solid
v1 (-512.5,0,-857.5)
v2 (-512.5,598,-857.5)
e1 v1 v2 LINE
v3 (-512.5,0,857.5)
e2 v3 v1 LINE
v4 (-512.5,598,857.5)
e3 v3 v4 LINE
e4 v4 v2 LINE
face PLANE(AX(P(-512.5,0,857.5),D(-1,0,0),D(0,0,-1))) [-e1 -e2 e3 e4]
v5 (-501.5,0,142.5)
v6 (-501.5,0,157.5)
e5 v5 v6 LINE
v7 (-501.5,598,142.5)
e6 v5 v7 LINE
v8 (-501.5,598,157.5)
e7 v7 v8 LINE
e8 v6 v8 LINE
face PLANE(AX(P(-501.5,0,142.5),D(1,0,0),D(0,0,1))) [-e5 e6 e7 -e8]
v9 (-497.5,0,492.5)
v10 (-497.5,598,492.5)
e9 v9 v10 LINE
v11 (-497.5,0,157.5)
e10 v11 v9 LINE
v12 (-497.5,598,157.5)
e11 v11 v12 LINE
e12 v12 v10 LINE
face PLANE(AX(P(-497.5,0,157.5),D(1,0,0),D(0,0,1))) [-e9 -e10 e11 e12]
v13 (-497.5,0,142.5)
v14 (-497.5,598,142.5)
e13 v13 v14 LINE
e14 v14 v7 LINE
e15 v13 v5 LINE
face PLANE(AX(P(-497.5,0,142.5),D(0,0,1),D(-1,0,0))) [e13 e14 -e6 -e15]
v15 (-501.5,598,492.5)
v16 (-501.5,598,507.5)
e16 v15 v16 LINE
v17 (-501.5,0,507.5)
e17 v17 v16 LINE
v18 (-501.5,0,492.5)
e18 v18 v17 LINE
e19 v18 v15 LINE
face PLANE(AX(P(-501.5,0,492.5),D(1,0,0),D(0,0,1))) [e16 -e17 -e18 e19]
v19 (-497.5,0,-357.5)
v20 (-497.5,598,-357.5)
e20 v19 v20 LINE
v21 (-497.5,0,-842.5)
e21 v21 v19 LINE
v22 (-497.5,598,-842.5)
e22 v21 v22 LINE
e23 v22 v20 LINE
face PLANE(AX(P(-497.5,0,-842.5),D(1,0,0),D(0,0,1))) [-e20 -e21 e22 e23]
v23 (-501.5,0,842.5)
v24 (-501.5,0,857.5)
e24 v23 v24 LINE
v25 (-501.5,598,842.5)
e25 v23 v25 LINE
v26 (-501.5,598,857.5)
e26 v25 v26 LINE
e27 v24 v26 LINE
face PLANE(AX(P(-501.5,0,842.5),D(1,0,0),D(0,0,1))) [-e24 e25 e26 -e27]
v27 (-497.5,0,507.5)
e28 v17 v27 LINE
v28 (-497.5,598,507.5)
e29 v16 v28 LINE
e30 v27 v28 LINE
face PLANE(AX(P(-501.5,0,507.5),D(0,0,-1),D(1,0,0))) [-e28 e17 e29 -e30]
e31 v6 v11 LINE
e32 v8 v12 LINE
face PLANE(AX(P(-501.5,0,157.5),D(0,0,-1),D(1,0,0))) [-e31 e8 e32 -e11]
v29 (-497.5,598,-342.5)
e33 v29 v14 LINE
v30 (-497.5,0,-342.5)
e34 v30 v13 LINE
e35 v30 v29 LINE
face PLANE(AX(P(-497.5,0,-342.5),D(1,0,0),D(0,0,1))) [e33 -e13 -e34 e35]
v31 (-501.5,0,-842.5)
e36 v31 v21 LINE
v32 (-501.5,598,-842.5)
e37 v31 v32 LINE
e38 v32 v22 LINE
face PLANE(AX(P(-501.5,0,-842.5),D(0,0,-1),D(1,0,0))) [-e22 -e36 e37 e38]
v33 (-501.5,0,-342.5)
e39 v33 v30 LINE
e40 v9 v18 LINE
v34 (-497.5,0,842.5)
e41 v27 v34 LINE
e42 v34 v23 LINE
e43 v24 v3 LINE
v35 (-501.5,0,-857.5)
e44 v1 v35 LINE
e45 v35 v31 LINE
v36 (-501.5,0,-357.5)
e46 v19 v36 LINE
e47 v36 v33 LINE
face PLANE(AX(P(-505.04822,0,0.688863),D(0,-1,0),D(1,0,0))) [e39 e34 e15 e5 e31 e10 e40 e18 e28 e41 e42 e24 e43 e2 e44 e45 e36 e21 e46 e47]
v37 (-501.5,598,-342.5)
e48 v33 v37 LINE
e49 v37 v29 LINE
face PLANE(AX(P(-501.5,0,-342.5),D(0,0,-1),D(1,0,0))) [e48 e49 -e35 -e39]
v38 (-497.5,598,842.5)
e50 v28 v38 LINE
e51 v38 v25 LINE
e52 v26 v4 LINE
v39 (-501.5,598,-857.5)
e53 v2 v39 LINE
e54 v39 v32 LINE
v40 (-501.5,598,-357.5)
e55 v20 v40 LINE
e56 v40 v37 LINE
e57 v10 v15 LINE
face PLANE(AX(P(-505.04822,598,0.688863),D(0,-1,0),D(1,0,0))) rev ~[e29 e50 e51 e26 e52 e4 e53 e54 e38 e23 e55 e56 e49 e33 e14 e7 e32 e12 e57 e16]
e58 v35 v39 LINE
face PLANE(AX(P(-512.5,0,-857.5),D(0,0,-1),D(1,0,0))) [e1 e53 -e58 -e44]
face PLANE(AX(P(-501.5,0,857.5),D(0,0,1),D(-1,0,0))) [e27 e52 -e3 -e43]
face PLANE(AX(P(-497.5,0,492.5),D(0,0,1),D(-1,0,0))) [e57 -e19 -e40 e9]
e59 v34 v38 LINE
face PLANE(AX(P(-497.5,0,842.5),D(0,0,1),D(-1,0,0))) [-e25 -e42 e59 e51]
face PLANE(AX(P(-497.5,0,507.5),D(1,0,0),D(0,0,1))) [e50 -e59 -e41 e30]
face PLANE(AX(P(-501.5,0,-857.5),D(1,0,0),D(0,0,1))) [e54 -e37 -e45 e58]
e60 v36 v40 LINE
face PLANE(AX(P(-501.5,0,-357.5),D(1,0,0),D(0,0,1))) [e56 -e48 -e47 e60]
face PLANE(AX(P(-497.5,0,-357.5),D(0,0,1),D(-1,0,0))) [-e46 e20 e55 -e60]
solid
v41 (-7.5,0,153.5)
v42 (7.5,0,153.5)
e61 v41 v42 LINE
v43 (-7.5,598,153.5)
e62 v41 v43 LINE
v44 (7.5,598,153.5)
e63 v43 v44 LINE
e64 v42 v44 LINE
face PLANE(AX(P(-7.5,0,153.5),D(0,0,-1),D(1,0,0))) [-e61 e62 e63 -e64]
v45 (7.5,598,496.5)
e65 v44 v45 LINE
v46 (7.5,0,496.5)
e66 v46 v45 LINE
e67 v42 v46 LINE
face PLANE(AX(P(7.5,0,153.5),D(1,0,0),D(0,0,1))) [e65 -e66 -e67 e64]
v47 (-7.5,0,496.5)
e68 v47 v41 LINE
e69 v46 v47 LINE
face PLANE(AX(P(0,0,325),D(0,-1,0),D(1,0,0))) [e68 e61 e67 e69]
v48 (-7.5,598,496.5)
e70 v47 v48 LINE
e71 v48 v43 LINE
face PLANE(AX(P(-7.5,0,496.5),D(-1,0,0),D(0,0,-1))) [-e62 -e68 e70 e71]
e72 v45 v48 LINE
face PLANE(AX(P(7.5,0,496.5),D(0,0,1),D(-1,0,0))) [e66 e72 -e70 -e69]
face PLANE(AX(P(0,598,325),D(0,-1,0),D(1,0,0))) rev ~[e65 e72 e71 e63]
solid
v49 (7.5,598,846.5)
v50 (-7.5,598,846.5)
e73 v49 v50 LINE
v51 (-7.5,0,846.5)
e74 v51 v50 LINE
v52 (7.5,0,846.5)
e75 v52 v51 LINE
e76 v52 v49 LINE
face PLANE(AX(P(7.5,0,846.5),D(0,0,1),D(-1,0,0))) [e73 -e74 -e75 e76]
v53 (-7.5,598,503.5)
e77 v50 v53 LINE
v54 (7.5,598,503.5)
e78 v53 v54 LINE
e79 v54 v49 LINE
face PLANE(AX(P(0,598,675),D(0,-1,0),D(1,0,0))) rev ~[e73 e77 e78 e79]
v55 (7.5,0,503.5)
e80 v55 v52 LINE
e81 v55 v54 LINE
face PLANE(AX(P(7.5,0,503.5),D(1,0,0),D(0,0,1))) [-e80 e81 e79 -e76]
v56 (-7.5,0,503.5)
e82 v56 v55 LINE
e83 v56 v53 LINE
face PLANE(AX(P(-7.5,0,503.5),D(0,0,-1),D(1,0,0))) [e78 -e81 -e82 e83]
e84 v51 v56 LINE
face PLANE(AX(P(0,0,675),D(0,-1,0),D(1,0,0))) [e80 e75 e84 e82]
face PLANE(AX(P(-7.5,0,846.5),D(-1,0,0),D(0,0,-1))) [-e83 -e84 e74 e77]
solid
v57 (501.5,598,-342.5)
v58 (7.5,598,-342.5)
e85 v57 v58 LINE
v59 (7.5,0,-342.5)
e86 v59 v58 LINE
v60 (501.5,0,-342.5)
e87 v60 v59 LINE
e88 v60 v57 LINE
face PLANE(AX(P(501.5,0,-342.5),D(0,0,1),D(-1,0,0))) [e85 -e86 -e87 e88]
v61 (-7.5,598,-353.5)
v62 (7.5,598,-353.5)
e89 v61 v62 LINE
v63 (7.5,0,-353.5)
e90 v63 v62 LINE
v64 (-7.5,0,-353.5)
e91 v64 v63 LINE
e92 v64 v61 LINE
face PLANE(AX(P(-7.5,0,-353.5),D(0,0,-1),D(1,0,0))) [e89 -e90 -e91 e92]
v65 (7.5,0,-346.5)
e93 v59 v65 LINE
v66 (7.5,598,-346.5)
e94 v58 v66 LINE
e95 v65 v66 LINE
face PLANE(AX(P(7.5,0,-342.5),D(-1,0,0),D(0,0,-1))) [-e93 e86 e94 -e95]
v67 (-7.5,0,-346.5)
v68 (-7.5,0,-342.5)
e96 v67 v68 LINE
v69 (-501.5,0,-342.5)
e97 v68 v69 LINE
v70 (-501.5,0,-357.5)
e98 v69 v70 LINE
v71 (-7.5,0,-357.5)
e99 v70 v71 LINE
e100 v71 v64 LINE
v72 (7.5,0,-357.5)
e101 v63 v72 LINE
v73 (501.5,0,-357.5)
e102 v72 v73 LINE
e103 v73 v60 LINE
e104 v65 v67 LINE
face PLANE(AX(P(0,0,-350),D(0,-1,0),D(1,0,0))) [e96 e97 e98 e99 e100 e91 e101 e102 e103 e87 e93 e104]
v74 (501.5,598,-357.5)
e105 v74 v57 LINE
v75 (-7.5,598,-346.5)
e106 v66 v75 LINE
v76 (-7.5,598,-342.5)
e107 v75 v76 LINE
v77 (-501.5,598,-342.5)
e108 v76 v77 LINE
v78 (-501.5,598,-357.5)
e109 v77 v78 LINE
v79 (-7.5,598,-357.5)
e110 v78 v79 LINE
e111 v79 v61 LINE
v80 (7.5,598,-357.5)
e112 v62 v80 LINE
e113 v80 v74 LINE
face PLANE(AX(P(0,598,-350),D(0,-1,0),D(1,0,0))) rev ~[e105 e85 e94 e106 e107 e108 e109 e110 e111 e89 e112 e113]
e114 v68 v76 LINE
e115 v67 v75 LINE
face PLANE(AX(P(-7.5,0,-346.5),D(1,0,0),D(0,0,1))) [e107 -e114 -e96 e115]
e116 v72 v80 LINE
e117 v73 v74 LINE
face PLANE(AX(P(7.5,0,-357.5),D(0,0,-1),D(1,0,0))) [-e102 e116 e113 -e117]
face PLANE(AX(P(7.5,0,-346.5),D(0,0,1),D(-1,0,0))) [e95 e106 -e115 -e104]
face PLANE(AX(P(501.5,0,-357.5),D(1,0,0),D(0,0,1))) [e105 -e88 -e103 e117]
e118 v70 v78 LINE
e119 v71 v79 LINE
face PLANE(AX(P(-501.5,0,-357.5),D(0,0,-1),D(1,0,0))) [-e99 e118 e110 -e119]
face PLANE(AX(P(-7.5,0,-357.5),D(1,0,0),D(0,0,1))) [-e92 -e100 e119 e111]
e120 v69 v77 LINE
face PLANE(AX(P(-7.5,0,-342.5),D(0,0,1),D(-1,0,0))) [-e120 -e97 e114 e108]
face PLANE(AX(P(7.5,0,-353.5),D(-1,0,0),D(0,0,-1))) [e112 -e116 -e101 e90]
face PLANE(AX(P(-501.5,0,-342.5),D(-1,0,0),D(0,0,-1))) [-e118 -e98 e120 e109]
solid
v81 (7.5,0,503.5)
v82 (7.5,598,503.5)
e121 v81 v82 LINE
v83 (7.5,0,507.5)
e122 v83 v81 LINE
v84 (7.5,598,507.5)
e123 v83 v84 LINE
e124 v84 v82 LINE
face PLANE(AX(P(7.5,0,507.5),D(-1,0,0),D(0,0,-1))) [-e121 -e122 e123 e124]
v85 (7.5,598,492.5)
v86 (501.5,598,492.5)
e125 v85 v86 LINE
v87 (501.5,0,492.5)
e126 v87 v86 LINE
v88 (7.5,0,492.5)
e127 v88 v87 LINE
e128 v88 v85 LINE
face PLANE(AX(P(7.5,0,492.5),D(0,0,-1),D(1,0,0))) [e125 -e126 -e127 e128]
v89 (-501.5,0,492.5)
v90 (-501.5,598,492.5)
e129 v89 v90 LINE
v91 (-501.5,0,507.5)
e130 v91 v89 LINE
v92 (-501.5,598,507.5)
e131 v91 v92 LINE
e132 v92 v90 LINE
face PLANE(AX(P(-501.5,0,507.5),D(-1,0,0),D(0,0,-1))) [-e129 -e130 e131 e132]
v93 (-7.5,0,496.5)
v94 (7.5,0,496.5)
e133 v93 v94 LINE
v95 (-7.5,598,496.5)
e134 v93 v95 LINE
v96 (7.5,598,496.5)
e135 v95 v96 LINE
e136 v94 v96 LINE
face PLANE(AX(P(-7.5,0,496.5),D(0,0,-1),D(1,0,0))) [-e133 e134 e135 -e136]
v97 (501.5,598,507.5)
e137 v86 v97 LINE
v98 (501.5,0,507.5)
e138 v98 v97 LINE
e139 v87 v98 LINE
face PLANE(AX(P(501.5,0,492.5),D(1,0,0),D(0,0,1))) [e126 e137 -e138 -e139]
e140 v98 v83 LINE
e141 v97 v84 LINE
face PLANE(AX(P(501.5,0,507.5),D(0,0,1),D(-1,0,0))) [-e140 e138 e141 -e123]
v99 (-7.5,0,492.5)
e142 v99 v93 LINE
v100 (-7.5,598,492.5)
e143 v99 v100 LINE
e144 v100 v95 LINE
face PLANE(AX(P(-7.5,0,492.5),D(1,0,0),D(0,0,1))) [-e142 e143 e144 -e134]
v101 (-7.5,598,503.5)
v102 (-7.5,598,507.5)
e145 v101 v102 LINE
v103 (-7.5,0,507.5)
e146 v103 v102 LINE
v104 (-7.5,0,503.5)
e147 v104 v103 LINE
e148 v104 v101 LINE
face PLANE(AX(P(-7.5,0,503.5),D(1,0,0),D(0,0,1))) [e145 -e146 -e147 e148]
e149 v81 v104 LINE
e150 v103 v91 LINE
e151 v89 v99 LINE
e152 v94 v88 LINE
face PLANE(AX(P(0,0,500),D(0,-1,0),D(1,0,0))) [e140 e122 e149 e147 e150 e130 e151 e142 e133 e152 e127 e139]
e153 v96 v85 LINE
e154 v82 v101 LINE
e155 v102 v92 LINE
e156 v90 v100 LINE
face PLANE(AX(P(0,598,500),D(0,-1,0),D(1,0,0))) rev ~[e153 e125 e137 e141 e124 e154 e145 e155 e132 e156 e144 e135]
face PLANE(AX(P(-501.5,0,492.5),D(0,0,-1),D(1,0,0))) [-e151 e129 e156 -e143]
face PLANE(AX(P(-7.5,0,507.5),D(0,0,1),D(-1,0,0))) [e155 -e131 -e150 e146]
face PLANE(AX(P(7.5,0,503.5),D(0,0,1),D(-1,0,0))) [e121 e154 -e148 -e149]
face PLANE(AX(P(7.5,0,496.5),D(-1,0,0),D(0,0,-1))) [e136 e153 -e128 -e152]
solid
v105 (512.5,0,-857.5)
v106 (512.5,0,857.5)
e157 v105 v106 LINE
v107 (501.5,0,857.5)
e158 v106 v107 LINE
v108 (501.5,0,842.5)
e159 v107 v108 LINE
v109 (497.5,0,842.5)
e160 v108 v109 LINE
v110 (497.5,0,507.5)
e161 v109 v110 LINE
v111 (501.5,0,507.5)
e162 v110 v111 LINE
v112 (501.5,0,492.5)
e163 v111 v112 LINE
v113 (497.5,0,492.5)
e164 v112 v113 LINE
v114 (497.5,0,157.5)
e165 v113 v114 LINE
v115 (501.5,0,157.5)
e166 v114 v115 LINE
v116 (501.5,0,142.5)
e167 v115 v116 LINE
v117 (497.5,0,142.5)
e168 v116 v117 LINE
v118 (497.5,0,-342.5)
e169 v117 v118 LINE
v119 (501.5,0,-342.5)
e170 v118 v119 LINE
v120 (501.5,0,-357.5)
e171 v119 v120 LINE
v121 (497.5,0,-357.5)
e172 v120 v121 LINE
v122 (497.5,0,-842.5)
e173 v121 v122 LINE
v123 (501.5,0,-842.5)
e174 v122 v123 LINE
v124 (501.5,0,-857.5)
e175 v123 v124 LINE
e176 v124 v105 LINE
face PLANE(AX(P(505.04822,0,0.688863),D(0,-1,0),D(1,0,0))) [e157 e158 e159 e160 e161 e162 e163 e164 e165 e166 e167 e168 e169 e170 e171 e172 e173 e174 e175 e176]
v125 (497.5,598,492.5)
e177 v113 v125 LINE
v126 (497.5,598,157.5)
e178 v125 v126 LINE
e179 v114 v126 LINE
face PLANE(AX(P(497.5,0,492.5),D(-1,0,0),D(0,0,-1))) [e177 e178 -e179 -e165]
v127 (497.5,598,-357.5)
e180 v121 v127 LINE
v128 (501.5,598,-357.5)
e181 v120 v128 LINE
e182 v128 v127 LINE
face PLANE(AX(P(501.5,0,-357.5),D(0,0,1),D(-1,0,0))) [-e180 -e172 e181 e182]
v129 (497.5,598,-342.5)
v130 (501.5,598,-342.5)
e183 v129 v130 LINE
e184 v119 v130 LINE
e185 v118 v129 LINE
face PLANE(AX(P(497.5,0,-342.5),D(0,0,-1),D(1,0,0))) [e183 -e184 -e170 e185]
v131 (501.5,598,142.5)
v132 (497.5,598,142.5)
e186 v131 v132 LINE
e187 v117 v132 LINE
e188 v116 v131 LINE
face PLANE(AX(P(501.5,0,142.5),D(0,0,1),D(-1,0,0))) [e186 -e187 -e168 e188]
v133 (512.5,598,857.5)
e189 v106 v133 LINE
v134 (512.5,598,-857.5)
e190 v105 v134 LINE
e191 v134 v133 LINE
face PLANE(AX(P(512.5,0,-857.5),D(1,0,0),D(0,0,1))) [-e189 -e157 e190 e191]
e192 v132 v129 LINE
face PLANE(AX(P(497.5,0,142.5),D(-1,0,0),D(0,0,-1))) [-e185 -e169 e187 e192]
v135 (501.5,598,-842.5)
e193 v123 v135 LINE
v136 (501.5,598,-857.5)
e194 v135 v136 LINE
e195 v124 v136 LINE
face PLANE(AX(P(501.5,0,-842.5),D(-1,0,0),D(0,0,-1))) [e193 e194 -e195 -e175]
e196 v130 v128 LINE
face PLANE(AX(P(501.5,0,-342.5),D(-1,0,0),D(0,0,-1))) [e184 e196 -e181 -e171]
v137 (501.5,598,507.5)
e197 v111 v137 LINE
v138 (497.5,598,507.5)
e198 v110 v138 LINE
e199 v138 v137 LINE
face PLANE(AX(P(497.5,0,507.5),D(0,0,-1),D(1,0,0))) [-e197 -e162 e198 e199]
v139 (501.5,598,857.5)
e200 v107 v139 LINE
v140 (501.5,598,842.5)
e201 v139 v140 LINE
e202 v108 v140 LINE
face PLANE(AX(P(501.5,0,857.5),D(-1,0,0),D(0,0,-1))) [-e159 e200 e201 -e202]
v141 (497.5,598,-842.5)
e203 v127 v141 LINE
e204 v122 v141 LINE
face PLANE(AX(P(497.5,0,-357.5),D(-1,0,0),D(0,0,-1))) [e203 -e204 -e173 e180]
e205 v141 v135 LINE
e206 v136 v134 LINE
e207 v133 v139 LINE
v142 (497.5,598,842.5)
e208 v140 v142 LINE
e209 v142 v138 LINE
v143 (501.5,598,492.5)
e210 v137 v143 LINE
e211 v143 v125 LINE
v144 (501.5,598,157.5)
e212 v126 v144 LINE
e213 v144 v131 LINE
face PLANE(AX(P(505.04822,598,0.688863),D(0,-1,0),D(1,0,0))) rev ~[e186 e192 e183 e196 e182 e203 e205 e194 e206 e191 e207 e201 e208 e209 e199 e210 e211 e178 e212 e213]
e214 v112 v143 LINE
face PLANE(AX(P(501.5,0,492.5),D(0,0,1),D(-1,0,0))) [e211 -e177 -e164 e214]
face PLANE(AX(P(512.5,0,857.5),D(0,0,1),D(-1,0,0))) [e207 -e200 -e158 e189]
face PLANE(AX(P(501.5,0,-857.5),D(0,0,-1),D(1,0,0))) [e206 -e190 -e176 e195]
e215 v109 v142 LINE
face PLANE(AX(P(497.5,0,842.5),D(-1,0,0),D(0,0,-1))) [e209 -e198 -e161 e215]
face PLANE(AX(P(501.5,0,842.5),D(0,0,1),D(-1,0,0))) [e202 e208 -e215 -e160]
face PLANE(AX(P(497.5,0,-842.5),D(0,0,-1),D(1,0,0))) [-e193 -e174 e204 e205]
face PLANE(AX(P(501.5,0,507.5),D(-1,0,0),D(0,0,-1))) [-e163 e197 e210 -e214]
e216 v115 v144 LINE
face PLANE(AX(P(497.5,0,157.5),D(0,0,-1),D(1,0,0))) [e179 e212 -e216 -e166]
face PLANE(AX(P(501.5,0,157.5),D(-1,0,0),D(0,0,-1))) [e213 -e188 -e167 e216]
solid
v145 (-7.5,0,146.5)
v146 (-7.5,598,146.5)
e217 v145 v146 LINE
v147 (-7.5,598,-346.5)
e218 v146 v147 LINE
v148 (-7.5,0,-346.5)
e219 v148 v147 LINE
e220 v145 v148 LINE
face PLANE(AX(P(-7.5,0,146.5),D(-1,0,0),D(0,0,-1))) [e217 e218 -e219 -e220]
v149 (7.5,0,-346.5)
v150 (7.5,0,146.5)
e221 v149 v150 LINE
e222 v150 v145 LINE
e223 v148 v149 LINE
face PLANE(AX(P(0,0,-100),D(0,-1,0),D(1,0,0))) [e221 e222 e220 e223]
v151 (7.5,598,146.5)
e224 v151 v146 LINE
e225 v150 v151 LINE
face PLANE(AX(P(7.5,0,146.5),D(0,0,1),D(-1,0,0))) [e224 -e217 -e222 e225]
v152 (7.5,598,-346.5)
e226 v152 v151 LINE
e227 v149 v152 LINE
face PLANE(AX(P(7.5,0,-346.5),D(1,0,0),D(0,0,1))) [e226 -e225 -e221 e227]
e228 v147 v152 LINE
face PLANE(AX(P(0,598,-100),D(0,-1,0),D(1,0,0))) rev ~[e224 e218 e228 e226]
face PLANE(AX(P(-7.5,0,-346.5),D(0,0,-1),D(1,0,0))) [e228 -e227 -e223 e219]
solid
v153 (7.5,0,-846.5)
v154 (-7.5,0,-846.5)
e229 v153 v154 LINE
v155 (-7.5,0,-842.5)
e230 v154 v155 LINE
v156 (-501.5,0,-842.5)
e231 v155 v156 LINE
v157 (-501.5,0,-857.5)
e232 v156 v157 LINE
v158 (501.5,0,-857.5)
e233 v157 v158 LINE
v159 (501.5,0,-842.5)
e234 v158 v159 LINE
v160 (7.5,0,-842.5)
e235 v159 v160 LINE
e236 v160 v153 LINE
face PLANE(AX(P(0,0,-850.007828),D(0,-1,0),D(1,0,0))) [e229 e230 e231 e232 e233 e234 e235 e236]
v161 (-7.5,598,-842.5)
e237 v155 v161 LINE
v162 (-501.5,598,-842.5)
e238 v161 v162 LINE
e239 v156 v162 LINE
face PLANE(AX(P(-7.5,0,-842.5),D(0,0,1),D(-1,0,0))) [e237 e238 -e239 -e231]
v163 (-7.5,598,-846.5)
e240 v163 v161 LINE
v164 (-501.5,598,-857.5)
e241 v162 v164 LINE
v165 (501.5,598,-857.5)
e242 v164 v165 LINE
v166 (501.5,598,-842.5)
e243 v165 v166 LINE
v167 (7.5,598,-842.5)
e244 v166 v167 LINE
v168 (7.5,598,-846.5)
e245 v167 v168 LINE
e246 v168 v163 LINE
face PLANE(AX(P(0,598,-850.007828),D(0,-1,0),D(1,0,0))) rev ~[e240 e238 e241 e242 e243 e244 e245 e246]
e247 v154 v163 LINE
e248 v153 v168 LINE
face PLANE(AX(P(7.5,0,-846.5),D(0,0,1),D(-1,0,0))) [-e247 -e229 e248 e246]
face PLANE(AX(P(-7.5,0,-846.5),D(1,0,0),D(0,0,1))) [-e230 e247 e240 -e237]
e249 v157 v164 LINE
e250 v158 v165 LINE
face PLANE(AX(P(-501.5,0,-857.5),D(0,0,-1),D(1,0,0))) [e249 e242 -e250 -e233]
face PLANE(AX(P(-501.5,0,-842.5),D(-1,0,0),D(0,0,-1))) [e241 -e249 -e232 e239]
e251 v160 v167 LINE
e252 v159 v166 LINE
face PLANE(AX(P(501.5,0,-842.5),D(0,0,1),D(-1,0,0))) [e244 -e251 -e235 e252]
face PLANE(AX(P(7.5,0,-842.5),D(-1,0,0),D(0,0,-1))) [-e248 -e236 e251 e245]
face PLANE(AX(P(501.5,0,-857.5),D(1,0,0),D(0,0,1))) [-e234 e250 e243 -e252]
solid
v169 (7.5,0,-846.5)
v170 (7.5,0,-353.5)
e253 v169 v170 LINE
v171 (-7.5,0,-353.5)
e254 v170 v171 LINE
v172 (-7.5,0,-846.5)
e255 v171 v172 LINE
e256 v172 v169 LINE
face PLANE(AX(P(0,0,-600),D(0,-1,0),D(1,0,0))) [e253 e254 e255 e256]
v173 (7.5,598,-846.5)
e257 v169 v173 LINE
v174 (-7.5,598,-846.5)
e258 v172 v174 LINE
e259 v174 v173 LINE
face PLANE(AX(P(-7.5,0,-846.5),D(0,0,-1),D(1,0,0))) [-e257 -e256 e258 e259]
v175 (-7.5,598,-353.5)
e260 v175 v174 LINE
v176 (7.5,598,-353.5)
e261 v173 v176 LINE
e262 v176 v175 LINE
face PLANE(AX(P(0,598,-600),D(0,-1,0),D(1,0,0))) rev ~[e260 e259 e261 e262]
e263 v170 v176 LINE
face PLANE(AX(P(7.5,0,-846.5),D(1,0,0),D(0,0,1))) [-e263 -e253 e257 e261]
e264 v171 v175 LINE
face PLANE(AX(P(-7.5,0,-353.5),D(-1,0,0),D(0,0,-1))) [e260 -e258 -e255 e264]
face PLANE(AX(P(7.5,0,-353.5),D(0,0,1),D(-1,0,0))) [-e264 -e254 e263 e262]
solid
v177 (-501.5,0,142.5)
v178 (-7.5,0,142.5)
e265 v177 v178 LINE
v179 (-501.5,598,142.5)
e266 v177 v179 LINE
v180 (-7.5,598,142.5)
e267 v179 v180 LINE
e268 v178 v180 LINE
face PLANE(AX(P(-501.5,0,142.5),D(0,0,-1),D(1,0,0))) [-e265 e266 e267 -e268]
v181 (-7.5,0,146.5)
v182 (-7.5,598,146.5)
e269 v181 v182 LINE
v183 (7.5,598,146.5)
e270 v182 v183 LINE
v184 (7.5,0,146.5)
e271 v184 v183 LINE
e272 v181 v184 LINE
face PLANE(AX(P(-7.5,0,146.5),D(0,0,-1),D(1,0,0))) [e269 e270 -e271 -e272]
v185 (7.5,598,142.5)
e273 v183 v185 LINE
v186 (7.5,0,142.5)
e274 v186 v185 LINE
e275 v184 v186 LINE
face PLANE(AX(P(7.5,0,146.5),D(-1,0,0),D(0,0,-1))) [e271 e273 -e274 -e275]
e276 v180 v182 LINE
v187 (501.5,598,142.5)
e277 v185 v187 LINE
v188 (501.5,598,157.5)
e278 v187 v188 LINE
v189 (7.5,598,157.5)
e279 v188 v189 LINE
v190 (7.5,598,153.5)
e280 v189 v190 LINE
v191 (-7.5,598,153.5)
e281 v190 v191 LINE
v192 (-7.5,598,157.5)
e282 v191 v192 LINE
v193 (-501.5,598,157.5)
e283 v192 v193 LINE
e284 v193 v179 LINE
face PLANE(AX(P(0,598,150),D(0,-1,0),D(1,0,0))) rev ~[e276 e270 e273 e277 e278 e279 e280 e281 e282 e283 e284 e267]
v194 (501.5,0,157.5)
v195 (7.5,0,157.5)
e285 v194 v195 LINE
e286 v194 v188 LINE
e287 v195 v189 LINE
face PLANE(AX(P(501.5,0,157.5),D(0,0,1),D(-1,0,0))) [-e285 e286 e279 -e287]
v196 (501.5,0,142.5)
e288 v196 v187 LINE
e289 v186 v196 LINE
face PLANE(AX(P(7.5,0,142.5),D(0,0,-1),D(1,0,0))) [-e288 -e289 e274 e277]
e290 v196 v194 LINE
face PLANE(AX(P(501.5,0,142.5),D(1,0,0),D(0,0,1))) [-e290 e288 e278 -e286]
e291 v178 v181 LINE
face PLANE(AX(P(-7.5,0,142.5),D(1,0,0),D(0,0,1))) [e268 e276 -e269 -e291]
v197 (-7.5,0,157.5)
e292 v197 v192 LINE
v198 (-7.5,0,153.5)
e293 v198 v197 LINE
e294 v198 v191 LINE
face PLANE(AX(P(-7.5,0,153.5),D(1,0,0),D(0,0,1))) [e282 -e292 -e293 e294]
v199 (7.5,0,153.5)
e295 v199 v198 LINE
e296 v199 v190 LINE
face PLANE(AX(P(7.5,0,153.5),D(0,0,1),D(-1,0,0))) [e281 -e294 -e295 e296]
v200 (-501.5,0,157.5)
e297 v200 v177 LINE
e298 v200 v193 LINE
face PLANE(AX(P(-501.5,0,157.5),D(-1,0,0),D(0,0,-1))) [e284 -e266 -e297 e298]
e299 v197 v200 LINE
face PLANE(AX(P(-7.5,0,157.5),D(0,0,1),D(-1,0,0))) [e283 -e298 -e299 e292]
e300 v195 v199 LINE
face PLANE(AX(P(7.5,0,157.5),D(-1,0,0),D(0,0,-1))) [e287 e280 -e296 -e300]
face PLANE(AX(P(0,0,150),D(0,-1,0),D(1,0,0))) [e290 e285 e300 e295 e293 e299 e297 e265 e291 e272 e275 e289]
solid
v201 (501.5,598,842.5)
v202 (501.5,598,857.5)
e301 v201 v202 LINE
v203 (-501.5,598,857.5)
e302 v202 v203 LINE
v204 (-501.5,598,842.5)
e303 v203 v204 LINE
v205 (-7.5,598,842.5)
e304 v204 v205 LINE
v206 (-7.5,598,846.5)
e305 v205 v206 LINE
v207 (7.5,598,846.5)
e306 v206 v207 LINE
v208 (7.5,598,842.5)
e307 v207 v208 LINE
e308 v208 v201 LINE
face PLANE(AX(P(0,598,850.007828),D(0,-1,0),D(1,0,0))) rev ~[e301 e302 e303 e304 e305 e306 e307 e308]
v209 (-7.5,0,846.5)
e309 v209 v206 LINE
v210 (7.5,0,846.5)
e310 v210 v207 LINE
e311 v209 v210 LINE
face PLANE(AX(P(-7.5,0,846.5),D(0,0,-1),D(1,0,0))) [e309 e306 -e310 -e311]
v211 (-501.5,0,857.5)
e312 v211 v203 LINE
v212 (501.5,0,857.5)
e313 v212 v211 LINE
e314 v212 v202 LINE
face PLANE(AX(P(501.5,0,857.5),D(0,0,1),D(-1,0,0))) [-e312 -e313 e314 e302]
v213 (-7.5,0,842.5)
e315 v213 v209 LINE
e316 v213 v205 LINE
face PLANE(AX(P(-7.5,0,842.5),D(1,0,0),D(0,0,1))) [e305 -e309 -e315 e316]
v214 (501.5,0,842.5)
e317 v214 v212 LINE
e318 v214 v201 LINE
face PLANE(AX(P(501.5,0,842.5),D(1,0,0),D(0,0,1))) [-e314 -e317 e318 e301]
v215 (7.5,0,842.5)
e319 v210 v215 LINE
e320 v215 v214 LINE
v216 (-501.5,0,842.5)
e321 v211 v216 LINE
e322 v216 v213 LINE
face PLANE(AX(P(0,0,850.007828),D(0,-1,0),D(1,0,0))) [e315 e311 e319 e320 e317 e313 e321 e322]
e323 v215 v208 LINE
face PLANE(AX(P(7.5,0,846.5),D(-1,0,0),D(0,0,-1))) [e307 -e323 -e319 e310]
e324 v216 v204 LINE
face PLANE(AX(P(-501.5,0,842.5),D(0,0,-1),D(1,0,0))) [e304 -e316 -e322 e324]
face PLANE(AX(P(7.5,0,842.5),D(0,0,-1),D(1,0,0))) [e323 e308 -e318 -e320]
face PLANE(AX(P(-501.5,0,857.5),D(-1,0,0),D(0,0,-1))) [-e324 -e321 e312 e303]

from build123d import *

# Parameters (mm, degrees)
F2_DEPTH = 598
F3_DEPTH = 598
F4_DEPTH = 598
F5_DEPTH = 598
F6_DEPTH = 598
F7_DEPTH = 598
F8_DEPTH = 598


# Not quite as in the source:
# - a feature names something its author has since deleted; it is built from what else it names


with BuildPart() as f2:
    # F1 (on Front) → F2 (new body)
    with BuildSketch(Plane.XZ):
        Polygon((-501.5, 842.5), (-501.5, 857.5), (-512.5, 857.5), (-512.5, -857.5), (-501.5, -857.5), (-501.5, -842.5), (-497.5, -842.5), (-497.5, -357.5), (-501.5, -357.5), (-501.5, -342.5), (-497.5, -342.5), (-497.5, 142.5), (-501.5, 142.5), (-501.5, 157.5), (-497.5, 157.5), (-497.5, 492.5), (-501.5, 492.5), (-501.5, 507.5), (-497.5, 507.5), (-497.5, 842.5), align=None)
    extrude(amount=-F2_DEPTH)


with BuildPart() as f3:
    # F1 (on Front) → F3 (new body)
    with BuildSketch(Plane.XZ):
        Polygon((501.5, 842.5), (497.5, 842.5), (497.5, 507.5), (501.5, 507.5), (501.5, 492.5), (497.5, 492.5), (497.5, 157.5), (501.5, 157.5), (501.5, 142.5), (497.5, 142.5), (497.5, -342.5), (501.5, -342.5), (501.5, -357.5), (497.5, -357.5), (497.5, -842.5), (501.5, -842.5), (501.5, -857.5), (512.5, -857.5), (512.5, 857.5), (501.5, 857.5), align=None)
    extrude(amount=-F3_DEPTH)


with BuildPart() as f4:
    # F1 (on Front) → F4 (new body)
    with BuildSketch(Plane.XZ):
        Polygon((7.5, 842.5), (497.5, 842.5), (501.5, 842.5), (501.5, 857.5), (-501.5, 857.5), (-501.5, 842.5), (-497.5, 842.5), (-7.5, 842.5), (-7.5, 846.5), (7.5, 846.5), align=None)
    extrude(amount=-F4_DEPTH)


with BuildPart() as f4b:
    # F1 (on Front) → F4, piece 2 (new body)
    with BuildSketch(Plane.XZ):
        Polygon((-501.5, -857.5), (501.5, -857.5), (501.5, -842.5), (497.5, -842.5), (7.5, -842.5), (7.5, -846.5), (-7.5, -846.5), (-7.5, -842.5), (-497.5, -842.5), (-501.5, -842.5), align=None)
    extrude(amount=-F4_DEPTH)


with BuildPart() as f5:
    # F1 (on Front) → F5 (new body)
    with BuildSketch(Plane.XZ):
        Polygon((7.5, -357.5), (497.5, -357.5), (501.5, -357.5), (501.5, -342.5), (497.5, -342.5), (7.5, -342.5), (7.5, -346.5), (-7.5, -346.5), (-7.5, -342.5), (-497.5, -342.5), (-501.5, -342.5), (-501.5, -357.5), (-497.5, -357.5), (-7.5, -357.5), (-7.5, -353.5), (7.5, -353.5), align=None)
    extrude(amount=-F5_DEPTH)


with BuildPart() as f6:
    # F1 (on Front) → F6 (new body)
    with BuildSketch(Plane.XZ):
        Polygon((7.5, 507.5), (7.5, 842.5), (7.5, 846.5), (-7.5, 846.5), (-7.5, 842.5), (-7.5, 507.5), (-7.5, 503.5), (7.5, 503.5), align=None)
    extrude(amount=-F6_DEPTH)


with BuildPart() as f6b:
    # F1 (on Front) → F6, piece 2 (new body)
    with BuildSketch(Plane.XZ):
        Polygon((7.5, 157.5), (7.5, 492.5), (7.5, 496.5), (-7.5, 496.5), (-7.5, 492.5), (-7.5, 157.5), (-7.5, 153.5), (7.5, 153.5), align=None)
    extrude(amount=-F6_DEPTH)


with BuildPart() as f7:
    # F1 (on Front) → F7 (new body)
    with BuildSketch(Plane.XZ):
        Polygon((7.5, -846.5), (7.5, -842.5), (7.5, -357.5), (7.5, -353.5), (-7.5, -353.5), (-7.5, -357.5), (-7.5, -842.5), (-7.5, -846.5), align=None)
    extrude(amount=-F7_DEPTH)


with BuildPart() as f7b:
    # F1 (on Front) → F7, piece 2 (new body)
    with BuildSketch(Plane.XZ):
        Polygon((7.5, -342.5), (7.5, 142.5), (7.5, 146.5), (-7.5, 146.5), (-7.5, 142.5), (-7.5, -342.5), (-7.5, -346.5), (7.5, -346.5), align=None)
    extrude(amount=-F7_DEPTH)


with BuildPart() as f8:
    # F1 (on Front) → F8 (new body)
    with BuildSketch(Plane.XZ):
        Polygon((501.5, 507.5), (497.5, 507.5), (7.5, 507.5), (7.5, 503.5), (-7.5, 503.5), (-7.5, 507.5), (-497.5, 507.5), (-501.5, 507.5), (-501.5, 492.5), (-497.5, 492.5), (-7.5, 492.5), (-7.5, 496.5), (7.5, 496.5), (7.5, 492.5), (497.5, 492.5), (501.5, 492.5), align=None)
    extrude(amount=-F8_DEPTH)


with BuildPart() as f8b:
    # F1 (on Front) → F8, piece 2 (new body)
    with BuildSketch(Plane.XZ):
        Polygon((501.5, 157.5), (497.5, 157.5), (7.5, 157.5), (7.5, 153.5), (-7.5, 153.5), (-7.5, 157.5), (-497.5, 157.5), (-501.5, 157.5), (-501.5, 142.5), (-497.5, 142.5), (-7.5, 142.5), (-7.5, 146.5), (7.5, 146.5), (7.5, 142.5), (497.5, 142.5), (501.5, 142.5), align=None)
    extrude(amount=-F8_DEPTH)


solid = Compound([f2.part, f3.part, f4.part, f4b.part, f5.part, f6.part, f6b.part, f7.part, f7b.part, f8.part, f8b.part])
